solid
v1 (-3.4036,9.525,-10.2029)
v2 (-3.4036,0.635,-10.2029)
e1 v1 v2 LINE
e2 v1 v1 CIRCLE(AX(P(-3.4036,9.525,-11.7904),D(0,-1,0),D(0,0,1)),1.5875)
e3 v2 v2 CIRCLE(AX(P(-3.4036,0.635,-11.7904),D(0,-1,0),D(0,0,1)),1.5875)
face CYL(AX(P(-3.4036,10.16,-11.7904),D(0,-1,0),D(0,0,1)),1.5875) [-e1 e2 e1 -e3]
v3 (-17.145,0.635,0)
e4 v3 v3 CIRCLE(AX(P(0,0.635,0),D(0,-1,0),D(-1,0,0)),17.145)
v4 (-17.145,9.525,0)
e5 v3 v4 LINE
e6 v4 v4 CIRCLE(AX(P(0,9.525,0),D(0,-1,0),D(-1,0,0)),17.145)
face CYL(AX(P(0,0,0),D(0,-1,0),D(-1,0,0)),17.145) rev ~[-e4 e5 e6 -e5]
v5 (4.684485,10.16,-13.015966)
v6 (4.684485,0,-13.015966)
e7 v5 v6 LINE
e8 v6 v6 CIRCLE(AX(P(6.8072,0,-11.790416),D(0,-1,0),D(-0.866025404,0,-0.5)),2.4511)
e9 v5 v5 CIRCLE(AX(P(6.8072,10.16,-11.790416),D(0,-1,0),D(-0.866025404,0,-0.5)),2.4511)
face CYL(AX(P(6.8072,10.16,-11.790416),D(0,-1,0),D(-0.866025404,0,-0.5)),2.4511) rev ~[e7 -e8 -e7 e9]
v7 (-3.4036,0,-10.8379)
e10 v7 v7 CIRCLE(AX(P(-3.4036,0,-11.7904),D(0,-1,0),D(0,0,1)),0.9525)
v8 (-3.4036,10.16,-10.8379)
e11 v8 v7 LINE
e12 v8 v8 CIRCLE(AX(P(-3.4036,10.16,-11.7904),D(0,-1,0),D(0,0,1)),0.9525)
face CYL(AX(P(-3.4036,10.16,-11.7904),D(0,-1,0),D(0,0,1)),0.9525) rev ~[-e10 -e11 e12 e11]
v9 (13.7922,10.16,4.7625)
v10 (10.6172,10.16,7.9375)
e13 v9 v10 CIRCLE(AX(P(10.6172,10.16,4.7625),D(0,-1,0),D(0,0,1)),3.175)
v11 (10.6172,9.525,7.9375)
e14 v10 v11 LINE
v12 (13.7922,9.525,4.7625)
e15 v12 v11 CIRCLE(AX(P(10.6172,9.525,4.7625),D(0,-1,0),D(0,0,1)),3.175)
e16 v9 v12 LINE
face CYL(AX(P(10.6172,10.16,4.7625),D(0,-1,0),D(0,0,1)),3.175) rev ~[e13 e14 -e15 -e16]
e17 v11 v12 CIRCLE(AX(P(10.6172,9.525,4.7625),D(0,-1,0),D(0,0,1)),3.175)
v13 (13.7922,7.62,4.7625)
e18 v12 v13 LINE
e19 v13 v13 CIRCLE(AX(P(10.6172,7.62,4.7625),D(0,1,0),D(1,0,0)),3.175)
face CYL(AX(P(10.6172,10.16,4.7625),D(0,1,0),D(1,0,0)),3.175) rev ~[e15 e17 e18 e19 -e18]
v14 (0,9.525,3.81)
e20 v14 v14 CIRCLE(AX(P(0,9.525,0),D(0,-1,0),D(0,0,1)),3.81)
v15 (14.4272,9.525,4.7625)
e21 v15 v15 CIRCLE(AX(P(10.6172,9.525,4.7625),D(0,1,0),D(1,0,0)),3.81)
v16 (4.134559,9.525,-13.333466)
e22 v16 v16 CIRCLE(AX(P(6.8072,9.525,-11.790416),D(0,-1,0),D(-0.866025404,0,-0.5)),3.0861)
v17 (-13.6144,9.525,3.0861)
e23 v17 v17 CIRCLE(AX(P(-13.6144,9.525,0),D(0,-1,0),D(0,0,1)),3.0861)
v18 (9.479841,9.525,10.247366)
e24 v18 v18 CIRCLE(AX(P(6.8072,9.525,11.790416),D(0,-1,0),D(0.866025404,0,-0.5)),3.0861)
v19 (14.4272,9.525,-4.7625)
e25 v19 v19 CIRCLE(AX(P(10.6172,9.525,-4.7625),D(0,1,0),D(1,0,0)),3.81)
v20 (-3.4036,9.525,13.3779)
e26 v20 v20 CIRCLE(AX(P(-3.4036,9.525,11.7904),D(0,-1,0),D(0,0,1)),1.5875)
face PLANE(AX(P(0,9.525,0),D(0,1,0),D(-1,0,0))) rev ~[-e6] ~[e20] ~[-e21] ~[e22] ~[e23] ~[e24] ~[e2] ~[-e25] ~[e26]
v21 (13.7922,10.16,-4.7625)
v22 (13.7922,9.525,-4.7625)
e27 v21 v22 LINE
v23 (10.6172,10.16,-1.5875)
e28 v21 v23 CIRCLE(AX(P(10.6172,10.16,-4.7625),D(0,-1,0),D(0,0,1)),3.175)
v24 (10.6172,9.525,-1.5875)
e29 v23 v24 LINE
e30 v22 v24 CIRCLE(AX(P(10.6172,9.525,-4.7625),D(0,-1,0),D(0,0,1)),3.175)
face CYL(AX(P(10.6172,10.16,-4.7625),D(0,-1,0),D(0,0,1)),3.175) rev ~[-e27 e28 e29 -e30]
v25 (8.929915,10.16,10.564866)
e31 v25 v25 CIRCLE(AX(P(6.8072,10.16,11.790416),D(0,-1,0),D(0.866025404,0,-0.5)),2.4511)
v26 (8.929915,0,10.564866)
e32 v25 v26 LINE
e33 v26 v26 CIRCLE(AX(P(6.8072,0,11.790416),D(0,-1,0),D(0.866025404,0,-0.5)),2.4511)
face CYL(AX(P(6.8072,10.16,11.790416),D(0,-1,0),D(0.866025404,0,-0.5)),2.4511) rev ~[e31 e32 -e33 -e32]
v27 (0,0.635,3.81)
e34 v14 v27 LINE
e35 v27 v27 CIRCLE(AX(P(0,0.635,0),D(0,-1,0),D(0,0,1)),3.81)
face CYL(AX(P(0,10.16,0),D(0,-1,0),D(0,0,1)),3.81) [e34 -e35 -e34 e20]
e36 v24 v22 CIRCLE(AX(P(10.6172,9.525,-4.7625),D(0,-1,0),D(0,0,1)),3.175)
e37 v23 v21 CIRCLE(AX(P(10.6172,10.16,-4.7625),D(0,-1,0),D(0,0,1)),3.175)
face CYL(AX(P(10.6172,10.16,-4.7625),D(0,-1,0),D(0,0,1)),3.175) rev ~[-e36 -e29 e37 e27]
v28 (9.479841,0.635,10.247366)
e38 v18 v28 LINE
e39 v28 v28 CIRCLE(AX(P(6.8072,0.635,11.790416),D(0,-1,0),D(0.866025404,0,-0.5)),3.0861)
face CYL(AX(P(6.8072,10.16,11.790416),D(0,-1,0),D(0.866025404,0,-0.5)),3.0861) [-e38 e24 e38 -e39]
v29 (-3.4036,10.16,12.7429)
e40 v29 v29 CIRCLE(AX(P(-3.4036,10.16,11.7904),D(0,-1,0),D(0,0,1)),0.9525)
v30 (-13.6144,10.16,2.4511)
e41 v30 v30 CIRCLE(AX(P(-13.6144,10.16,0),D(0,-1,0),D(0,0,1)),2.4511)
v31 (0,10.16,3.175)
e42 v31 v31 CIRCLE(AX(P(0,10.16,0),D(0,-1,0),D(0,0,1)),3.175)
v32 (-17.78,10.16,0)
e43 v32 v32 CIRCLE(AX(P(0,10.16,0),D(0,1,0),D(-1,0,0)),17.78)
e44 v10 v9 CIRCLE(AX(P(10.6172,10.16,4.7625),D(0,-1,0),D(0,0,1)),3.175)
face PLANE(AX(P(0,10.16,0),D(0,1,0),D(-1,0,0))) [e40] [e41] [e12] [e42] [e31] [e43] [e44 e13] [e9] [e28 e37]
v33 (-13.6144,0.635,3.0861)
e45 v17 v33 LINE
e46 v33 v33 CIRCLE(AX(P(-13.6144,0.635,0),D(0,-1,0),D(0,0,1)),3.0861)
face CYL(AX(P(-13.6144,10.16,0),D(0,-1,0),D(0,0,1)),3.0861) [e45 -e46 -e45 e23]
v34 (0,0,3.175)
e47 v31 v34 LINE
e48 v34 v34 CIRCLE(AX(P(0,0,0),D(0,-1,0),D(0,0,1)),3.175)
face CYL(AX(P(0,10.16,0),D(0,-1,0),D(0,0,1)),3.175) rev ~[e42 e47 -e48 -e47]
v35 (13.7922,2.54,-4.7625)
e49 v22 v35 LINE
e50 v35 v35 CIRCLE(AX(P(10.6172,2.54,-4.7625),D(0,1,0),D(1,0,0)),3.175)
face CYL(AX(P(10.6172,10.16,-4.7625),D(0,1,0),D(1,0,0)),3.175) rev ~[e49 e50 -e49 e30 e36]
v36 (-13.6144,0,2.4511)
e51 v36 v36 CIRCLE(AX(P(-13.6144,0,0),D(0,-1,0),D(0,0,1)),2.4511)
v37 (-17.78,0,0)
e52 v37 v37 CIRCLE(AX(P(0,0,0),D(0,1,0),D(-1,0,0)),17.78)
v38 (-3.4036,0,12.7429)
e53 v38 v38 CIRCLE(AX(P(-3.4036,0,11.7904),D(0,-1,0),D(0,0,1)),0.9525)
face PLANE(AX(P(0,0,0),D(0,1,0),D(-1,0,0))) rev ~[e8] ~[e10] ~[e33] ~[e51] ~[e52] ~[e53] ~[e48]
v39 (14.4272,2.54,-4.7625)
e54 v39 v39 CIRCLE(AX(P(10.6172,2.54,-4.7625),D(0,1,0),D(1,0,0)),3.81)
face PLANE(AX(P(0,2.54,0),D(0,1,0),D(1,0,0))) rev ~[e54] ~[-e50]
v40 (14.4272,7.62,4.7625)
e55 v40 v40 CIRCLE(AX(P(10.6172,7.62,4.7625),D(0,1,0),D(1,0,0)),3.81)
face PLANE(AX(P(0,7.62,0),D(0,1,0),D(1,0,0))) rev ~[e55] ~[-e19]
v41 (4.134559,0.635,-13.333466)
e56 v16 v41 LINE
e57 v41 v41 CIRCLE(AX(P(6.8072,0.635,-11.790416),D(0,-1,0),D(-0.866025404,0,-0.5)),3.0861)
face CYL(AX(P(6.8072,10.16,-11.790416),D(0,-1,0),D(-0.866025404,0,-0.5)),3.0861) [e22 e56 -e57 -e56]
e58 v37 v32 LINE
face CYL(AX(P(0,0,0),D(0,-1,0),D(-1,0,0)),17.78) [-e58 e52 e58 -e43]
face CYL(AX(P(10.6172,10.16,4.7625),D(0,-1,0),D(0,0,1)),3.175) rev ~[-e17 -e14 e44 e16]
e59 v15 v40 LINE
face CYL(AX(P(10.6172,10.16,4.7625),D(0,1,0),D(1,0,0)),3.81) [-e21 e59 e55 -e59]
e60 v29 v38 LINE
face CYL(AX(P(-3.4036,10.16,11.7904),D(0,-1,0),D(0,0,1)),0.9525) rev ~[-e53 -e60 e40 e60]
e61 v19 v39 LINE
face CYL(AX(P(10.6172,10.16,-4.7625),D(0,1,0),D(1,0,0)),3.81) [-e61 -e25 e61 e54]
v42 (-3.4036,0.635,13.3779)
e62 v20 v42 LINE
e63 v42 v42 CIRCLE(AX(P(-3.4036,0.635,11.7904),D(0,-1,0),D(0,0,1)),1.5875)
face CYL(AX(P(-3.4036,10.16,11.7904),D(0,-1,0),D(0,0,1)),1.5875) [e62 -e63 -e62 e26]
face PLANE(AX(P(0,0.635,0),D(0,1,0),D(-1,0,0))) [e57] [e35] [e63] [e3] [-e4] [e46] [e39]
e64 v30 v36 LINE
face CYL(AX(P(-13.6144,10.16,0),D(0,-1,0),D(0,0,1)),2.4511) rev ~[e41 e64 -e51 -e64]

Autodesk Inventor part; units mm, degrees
ref_plane "YZ Plane" through (0, 0, 0) normal (1, 0, 0) x (0, 1, 0)
ref_plane "XZ Plane" through (0, 0, 0) normal (0, 1, 0) x (-1, 0, 0)
ref_plane "XY Plane" through (0, 0, 0) normal (0, 0, 1) x (1, 0, 0)
sketch "Sketch1" plane through (0, 0, 0) normal (0, 1, 0) x (-1, 0, 0)
  circle A0 centre (0, 0) radius 17.78
  dimension "d0" = 35.56
extrude "Extrusion1" add sketch "Sketch1" along normal blind 10.16
sketch "Sketch2" plane through (0, 10.16, 0) normal (0, 1, 0) x (1, 0, 0)
  circle A0 centre (0, 0) radius 17.78 projected
hole "Hole1" at (0, 10.16, 0) direction (0, -1, 0) diameter 6.35 end through all
sketch "Sketch3" plane through (0, 10.16, 0) normal (0, 1, 0) x (1, 0, 0)
  line L0 (0, 0) -> (-13.6144, 0)
  dimension "d10" = 13.6144
hole "Hole2" at (-13.6144, 10.16, 0) direction (0, -1, 0) diameter 4.9022 end through all
pattern_circular "Circular Pattern1" count 3 over 360 about axis through (0, -41.1455, 0) along (0, 1, 0) of "Hole2"
sketch "Sketch5" plane through (0, 10.16, 0) normal (0, 1, 0) x (1, 0, 0)
  circle A0 centre (-13.6144, 0) radius 2.4511 projected
  circle A1 centre (6.8072, 11.7904) radius 2.4511 projected
  line L0 (-13.6144, 0) -> (6.8072, 11.7904)
  circle A2 centre (6.8072, -11.7904) radius 2.4511 projected
  line L1 (6.8072, 11.7904) -> (6.8072, -11.7904)
  line L2 (6.8072, -11.7904) -> (-13.6144, 0)
  line L3 (-13.6144, 0) -> (-13.6144, -11.7904)
  line L4 (-13.6144, -11.7904) -> (6.8072, -11.7904)
  line L5 (-13.6144, 0) -> (-13.6144, 11.7904)
  line L6 (-13.6144, 11.7904) -> (6.8072, 11.7904)
  circle A3 centre (-3.4036, 11.7904) radius 0.635
  circle A4 centre (-3.4036, -11.7904) radius 0.635
  point P0 (0, 0)
  dimension "d28" = 1.27
hole "Hole4" at (-3.4036, 10.16, 11.7904) at (-3.4036, 10.16, -11.7904) direction (0, -1, 0) diameter 1.905 end through all
shell "Shell1" thickness 0.635 removed faces 0
sketch "Sketch6" plane through (0, 10.16, 0) normal (0, 1, 0) x (1, 0, 0)
  circle A0 centre (-3.4036, 11.7904) radius 0.9525 projected
  circle A1 centre (-3.4036, -11.7904) radius 0.9525 projected
  line L0 (0, 0) -> (-3.4036, -11.7904)
  line L1 (-3.4036, 11.7904) -> (0, 0)
  line L2 (-3.4036, 11.7904) -> (-1.0567, 3.6605)
  circle A2 centre (0, 0) radius 3.81 projected
  line L3 (-3.4036, -11.7904) -> (-1.0567, -3.6605)
  line L4 (0, 0) -> (12.7, 0)
  circle A3 centre (6.8072, 11.7904) radius 2.4511 projected
  circle A4 centre (6.8072, -11.7904) radius 2.4511 projected
  line L5 (6.8072, 11.7904) -> (6.8072, -11.7904)
  line L6 (3.81, 0) -> (17.78, 0)
  circle A5 centre (0, 0) radius 17.78 projected
  line L7 (6.8072, 0) -> (10.6172, 0)
  line L8 (10.6172, 0) -> (10.6172, -3.175)
  line L9 (10.6172, 0) -> (10.6172, 3.175)
  line L10 (10.6172, 3.175) -> (10.6172, 6.35)
  line L11 (10.6172, 6.35) -> (10.6172, -6.35)
  line L12 (10.6172, 6.35) -> (10.6172, 0)
  line L13 (10.6172, 6.35) -> (10.6172, 3.175)
  line L14 (10.6172, -6.35) -> (10.6172, -3.175)
  circle A6 centre (10.6172, -4.7625) radius 3.175
  circle A7 centre (10.6172, 4.7625) radius 3.175
  dimension "d37" = 12.7
  dimension "d38" = 3.81
  dimension "d39" = 3.175
  dimension "d40" = 3.175
  dimension "d41" = 3.175
  dimension "d42" = 12.7
  dimension "d43" = 6.35
  dimension "d44" = 6.35
hole "Hole5" at (10.6172, 10.16, -4.7625) at (10.6172, 10.16, 4.7625) direction (0, -1, 0) diameter 6.35 depth 6.35
sketch "Sketch7" plane through (0, 10.16, 0) normal (0, 1, 0) x (1, 0, 0)
  circle A0 centre (10.6172, -4.7625) radius 3.175 projected
  circle A1 centre (10.6172, 4.7625) radius 3.175 projected
  circle A2 centre (10.6172, 4.7625) radius 3.81
  circle A3 centre (10.6172, -4.7625) radius 3.81
  point P0 (0, 0)
  dimension "d53" = 7.62
  dimension "d54" = 7.62
extrude "Extrusion2" add sketch "Sketch7" against normal blind 2.54 contours A3
extrude "Extrusion3" add sketch "Sketch7" against normal blind 7.62 contours A2
properties part number "water"
